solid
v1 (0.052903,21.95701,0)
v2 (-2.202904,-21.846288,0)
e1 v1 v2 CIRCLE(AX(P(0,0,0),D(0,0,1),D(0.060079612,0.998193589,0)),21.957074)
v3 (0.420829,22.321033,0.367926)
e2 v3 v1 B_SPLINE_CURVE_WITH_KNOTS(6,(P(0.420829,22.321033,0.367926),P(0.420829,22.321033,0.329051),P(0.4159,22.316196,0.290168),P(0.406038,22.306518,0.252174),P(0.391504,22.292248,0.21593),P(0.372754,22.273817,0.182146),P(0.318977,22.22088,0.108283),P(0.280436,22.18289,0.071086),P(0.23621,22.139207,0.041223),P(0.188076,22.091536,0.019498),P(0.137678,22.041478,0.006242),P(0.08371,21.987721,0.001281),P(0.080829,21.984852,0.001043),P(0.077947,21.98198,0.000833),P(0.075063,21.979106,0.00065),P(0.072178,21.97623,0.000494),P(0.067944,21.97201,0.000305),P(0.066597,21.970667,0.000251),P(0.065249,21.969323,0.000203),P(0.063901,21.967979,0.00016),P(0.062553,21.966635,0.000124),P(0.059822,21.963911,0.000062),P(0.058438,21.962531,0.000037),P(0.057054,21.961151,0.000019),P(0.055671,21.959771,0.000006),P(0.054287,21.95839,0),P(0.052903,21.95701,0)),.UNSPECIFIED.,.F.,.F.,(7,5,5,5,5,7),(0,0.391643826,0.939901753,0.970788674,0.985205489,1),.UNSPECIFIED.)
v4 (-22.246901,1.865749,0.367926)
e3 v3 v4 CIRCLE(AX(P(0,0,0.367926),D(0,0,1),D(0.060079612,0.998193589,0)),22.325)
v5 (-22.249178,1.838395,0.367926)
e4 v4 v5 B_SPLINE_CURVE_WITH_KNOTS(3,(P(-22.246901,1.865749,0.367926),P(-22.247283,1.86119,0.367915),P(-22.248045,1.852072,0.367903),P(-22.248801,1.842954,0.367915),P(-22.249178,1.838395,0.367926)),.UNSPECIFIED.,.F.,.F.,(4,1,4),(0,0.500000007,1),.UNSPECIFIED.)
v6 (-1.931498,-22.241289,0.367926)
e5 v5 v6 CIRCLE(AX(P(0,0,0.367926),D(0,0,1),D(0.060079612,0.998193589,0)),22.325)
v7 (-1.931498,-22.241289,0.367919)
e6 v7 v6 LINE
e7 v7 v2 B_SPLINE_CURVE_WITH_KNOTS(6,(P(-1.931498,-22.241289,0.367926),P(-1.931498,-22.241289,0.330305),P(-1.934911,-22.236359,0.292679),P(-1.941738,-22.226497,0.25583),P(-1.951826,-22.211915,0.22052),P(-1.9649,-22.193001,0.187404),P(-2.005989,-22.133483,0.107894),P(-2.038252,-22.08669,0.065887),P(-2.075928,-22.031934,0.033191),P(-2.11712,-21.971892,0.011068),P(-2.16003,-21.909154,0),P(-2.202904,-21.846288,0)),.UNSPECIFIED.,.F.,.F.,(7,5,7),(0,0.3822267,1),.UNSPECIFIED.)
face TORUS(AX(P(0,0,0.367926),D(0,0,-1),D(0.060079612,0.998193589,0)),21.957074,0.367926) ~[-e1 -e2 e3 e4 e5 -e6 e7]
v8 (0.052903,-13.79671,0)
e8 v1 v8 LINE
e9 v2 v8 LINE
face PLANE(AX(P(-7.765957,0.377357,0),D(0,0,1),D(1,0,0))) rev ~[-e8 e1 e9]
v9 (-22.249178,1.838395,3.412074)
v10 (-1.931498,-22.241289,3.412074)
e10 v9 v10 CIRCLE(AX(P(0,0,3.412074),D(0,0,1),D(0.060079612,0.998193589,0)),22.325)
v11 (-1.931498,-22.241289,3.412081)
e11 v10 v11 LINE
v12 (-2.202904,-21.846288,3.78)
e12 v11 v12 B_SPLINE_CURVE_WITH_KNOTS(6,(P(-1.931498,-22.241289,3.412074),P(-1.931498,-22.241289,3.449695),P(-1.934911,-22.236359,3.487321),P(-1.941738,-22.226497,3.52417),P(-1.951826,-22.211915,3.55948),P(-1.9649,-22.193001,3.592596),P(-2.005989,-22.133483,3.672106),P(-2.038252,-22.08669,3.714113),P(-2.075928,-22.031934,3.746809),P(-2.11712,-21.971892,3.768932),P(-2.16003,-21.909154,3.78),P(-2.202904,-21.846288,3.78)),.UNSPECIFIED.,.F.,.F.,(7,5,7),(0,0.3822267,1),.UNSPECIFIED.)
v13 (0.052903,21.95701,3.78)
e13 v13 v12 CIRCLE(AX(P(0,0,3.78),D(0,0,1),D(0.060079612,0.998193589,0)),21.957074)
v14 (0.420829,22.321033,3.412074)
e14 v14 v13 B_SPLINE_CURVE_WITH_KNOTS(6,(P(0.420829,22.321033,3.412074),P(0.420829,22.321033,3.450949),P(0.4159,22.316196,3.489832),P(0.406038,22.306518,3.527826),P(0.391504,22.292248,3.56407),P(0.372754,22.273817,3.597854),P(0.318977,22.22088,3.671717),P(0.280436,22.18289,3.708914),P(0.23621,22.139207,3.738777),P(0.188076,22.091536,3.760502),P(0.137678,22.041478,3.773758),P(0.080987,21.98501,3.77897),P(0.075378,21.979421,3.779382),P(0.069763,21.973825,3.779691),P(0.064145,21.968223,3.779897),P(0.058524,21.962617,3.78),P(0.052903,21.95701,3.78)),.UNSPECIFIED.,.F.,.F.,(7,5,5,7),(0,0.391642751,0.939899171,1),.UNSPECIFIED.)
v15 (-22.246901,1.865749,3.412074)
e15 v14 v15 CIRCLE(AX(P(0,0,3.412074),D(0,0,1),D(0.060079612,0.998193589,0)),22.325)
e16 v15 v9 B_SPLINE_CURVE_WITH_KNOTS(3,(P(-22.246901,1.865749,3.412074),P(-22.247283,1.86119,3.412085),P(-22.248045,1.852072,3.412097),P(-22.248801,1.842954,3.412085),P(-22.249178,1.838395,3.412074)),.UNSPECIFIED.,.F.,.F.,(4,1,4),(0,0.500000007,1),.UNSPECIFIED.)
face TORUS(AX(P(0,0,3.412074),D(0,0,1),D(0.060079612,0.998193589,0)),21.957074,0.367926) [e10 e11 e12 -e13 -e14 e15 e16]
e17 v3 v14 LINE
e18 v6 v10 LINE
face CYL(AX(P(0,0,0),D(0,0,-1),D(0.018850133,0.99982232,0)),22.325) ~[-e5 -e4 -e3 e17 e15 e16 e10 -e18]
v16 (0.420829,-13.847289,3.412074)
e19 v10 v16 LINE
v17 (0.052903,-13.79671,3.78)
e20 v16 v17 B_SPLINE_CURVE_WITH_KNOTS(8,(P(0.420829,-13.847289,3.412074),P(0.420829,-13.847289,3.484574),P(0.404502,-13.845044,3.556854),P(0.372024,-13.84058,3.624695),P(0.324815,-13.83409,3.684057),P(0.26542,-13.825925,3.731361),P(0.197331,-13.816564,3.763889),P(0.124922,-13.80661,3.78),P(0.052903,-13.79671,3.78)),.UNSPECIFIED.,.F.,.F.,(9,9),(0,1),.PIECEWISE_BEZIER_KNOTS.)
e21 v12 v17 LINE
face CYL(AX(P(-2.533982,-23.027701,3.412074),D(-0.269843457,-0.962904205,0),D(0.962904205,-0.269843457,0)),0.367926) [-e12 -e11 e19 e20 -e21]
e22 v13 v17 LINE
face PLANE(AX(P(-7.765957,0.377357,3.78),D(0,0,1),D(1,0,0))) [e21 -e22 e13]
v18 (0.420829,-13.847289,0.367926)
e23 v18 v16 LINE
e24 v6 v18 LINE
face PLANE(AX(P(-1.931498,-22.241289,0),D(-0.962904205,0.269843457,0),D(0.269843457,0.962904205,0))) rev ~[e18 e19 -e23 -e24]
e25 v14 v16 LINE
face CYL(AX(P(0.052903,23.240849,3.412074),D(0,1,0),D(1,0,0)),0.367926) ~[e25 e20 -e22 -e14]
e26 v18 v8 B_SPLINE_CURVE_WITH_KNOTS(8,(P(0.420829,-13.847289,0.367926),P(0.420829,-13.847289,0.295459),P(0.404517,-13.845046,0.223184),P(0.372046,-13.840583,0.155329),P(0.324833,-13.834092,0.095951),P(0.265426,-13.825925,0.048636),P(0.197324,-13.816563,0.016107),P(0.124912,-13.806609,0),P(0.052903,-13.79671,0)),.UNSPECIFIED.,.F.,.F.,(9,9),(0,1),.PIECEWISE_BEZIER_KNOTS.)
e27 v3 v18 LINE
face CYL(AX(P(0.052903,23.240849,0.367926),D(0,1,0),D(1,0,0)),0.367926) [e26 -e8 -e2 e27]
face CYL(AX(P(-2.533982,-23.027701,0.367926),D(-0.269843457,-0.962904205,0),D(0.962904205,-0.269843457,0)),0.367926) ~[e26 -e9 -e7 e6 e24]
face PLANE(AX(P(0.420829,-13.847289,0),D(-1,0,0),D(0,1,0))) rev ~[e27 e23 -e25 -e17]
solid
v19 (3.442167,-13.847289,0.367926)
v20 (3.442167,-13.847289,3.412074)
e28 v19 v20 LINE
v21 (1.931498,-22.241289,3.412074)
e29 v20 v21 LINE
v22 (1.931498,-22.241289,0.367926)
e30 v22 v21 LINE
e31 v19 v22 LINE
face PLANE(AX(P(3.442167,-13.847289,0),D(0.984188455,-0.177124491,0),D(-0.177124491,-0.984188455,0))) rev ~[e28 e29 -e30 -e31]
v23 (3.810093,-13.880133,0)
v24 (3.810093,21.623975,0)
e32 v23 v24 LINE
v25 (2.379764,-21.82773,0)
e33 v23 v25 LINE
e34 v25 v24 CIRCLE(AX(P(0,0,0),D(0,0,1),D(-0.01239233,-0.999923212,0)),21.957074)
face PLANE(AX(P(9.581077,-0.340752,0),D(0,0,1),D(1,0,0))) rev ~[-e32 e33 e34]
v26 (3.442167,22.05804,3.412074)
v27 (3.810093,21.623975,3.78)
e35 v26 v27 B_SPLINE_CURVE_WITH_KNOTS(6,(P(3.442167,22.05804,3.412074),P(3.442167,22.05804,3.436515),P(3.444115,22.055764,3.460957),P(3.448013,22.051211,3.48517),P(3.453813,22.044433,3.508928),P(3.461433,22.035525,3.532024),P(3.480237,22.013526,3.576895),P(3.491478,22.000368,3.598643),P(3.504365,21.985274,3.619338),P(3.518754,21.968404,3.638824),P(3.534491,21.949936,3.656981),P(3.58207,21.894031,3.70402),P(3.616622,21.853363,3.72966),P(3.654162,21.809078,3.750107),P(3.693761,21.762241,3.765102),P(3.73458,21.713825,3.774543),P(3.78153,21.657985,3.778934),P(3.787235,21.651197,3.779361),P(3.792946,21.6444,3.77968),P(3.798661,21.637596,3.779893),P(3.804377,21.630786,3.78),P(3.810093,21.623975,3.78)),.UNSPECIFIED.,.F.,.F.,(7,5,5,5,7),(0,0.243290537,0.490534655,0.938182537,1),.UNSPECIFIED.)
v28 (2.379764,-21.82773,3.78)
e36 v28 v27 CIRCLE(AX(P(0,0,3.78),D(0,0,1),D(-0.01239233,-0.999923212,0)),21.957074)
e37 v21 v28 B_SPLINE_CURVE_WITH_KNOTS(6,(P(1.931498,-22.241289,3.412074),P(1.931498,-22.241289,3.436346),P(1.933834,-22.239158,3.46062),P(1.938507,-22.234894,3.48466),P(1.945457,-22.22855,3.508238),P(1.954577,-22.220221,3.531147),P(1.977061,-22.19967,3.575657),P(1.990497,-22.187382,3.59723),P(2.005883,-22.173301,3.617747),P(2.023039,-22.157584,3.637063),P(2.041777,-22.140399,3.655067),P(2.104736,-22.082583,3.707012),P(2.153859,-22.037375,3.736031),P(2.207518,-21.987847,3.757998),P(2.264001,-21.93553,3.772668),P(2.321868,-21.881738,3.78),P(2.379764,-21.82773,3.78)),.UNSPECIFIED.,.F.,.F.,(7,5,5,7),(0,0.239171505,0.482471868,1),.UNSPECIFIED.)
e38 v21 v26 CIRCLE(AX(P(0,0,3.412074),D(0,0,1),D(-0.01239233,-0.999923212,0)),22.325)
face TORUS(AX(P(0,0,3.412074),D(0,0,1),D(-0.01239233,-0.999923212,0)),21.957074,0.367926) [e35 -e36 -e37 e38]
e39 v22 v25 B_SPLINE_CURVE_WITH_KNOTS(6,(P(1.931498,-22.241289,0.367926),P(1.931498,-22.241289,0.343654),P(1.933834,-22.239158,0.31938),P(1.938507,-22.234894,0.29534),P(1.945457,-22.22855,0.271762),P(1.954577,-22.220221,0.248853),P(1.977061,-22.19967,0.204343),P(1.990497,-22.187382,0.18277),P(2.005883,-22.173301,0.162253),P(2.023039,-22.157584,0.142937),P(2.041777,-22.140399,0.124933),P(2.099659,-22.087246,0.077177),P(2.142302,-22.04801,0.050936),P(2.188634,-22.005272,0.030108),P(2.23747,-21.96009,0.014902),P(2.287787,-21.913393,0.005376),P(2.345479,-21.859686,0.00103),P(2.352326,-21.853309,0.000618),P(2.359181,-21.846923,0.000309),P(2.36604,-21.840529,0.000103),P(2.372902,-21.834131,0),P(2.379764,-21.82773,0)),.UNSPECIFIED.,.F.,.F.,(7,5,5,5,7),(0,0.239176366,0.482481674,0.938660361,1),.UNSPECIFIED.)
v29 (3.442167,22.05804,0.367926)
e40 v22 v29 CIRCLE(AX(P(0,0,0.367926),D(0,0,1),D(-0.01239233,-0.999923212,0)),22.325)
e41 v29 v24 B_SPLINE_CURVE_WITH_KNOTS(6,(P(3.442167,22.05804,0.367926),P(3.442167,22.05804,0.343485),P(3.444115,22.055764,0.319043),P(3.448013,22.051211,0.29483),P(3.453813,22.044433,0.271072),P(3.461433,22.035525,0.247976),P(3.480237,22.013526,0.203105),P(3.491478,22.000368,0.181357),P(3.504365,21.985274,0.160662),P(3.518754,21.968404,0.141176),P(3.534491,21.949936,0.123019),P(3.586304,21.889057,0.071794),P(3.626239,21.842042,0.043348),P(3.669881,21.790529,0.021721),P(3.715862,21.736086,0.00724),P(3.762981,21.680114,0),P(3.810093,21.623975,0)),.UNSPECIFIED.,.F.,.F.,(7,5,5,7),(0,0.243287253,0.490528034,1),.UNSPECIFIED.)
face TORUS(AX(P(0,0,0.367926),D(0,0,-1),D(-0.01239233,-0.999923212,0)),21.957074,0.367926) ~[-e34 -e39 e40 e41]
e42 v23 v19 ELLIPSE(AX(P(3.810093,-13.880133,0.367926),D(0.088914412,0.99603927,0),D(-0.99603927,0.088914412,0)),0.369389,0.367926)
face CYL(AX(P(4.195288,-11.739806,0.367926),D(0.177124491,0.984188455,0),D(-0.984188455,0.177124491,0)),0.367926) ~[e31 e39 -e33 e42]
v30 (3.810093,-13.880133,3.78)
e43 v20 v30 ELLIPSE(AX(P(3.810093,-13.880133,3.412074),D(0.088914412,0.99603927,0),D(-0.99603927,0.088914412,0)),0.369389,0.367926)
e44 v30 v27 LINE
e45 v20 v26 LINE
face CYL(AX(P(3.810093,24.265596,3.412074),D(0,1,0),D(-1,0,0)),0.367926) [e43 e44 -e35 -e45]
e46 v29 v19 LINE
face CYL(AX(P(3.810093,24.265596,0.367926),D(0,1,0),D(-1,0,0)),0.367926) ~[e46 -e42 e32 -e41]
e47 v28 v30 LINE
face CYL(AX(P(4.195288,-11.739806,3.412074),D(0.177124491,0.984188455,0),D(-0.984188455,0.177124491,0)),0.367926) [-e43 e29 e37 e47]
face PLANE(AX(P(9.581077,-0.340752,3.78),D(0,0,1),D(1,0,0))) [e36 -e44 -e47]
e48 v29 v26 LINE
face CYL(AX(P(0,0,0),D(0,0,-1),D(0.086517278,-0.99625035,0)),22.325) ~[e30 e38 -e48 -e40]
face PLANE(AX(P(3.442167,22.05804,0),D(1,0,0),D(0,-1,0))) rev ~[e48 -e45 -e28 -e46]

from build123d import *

# Parameters (mm, degrees)
F1_DEPTH      = 3.78
F2_T4_DEPTH   = 40.3204423055
F2_T9_DEPTH   = 12.9439682299
F2_T14_DEPTH  = 12.9439682299
F2_T19_DEPTH  = 40.3204423055
F2_T22_ANGLE  = 177.5138742153
F2_T24_ANGLE  = 177.5138742153
F2_T29_DEPTH  = 40.3204423055
F2_T33_DEPTH  = 12.9439682299
F2_T40_DEPTH  = 40.3204423055
F2_T44_DEPTH  = 12.9439682299
F2_2_T1_DEPTH = 38.6518237684
F2_2_T3_DEPTH = 11.2008796601
F2_2_T6_ANGLE = 180.8453878552
F2_2_T8_ANGLE = 180.8453878552


# Not quite as in the source:
# - a fillet or chamfer that OpenCascade refuses, or shapes differently, is made with other operations: its cross-section is extruded or revolved along the edge and cut away or added


with BuildPart() as f1:
    # F0 (on Top) → F1 (new body)
    with BuildSketch(Plane.XY):
        with BuildLine():
            Line((3.4421672434, -13.8472889727), (1.9314982338, -22.2412890717))
            ThreePointArc((1.9314982338, -22.2412890717), (22.3120303803, -0.7608714143), (3.4421672434, 22.0580395699))
            Line((3.4421672434, 22.0580395699), (3.4421672434, -13.8472889727))
        make_face()
    extrude(amount=F1_DEPTH)

    # F2: fillet of radius 0.3679261469 on 6 edges, made by hand


with BuildPart() as f1b:
    # F0 (on Top) → F1, piece 2 (new body)
    with BuildSketch(Plane.XY):
        with BuildLine():
            Line((0.4208292241, -13.8472889727), (0.4208292241, 22.3210333041))
            ThreePointArc((0.4208292241, 22.3210333041), (-22.2939604848, 1.1768393701), (-1.9314982338, -22.2412890717))
            Line((-1.9314982338, -22.2412890717), (0.4208292241, -13.8472889727))
        make_face()
    extrude(amount=F1_DEPTH)

    # F2#2: fillet of radius 0.3679261469 on 6 edges, made by hand

    # F2_2_s2 → F2_2_t1 (cut)
    with BuildSketch(Plane.XZ.offset(-23.2408486714)):
        with BuildLine():
            ThreePointArc((0.4208292241, 3.4120738531), (0.3130661507, 3.6722369265), (0.0529030772, 3.78))
            Line((0.0529030772, 3.78), (0.4208292241, 3.78))
            Line((0.4208292241, 3.78), (0.4208292241, 3.4120738531))
        make_face()
        with BuildLine():
            ThreePointArc((0.4208292241, 0.3679261469), (0.3130661507, 0.1077630735), (0.0529030772, 0))
            Line((0.0529030772, 0), (0.4208292241, 0))
            Line((0.4208292241, 0), (0.4208292241, 0.3679261469))
        make_face()
    extrude(amount=F2_2_T1_DEPTH, mode=Mode.SUBTRACT)

    # F2_2_s4 → F2_2_t3 (cut)
    with BuildSketch(Plane(origin=(-6.1678788932, -22.0093405225, 0), x_dir=(0, 0, 1), z_dir=(0.2698434566, 0.9629042055, 0))):
        with BuildLine():
            ThreePointArc((3.4120738531, 4.1418185513), (3.6722369265, 4.0340554778), (3.78, 3.7738924044))
            Line((3.78, 3.7738924044), (3.78, 4.1418185513))
            Line((3.78, 4.1418185513), (3.4120738531, 4.1418185513))
        make_face()
        with BuildLine():
            ThreePointArc((0.3679261469, 4.1418185513), (0.1077630735, 4.0340554778), (0, 3.7738924044))
            Line((0, 3.7738924044), (0, 4.1418185513))
            Line((0, 4.1418185513), (0.3679261469, 4.1418185513))
        make_face()
    extrude(amount=F2_2_T3_DEPTH, mode=Mode.SUBTRACT)

    # F2_2_s5 → F2_2_t6 (revolve, cut)
    with BuildSketch(Plane(origin=(0, 0, 0), x_dir=(0, 0, 1), z_dir=(0.9981935886, -0.0600796118, 0))):
        with BuildLine():
            ThreePointArc((3.4120738531, -22.325), (3.6722369265, -22.2172369265), (3.78, -21.9570738531))
            Line((3.78, -21.9570738531), (3.78, -22.325))
            Line((3.78, -22.325), (3.4120738531, -22.325))
        make_face()
    revolve(axis=Axis((0, 0, 3.78), (0, 0, 1)), revolution_arc=F2_2_T6_ANGLE, mode=Mode.SUBTRACT)

    # F2_2_s7 → F2_2_t8 (revolve, cut)
    with BuildSketch(Plane(origin=(0, 0, 0), x_dir=(0, 0, 1), z_dir=(0.9981935886, -0.0600796118, 0))):
        with BuildLine():
            ThreePointArc((0.3679261469, -22.325), (0.1077630735, -22.2172369265), (0, -21.9570738531))
            Line((0, -21.9570738531), (0, -22.325))
            Line((0, -22.325), (0.3679261469, -22.325))
        make_face()
    revolve(axis=Axis((0, 0, 0), (0, 0, 1)), revolution_arc=F2_2_T8_ANGLE, mode=Mode.SUBTRACT)


with BuildPart() as f2_tool2:
    # F2_s3 → F2_t4 (new body)
    with BuildSketch(Plane.XZ.offset(-24.2655964514)):
        with BuildLine():
            ThreePointArc((3.4421672434, 3.4120738531), (3.5499303169, 3.6722369265), (3.8100933903, 3.78))
            Line((3.8100933903, 3.78), (3.8100933903, 3.7873585229))
            Line((3.8100933903, 3.7873585229), (3.4348087205, 3.7873585229))
            Line((3.4348087205, 3.7873585229), (3.4348087205, 3.4120738531))
            Line((3.4348087205, 3.4120738531), (3.4421672434, 3.4120738531))
        make_face()
    extrude(amount=F2_T4_DEPTH)

    split(bisect_by=Plane(origin=(5.7480889705, -1.0344841279, 0), x_dir=(0, 0, 1), z_dir=(-0.9841884548, 0.1771244914, 0)), keep=Keep.TOP)


with BuildPart() as f1_1:
    add(f1.part)

    # F2_t1: cut F2_tool2
    add(f2_tool2.part, mode=Mode.SUBTRACT)


with BuildPart() as f2_tool7:
    # F2_s8 → F2_t9 (new body)
    with BuildSketch(Plane(origin=(-1.9149093372, -10.6401528487, 0), x_dir=(0, 0, 1), z_dir=(-0.1771244914, -0.9841884548, 0))):
        with BuildLine():
            ThreePointArc((3.4120738531, -5.8404352769), (3.6722369265, -5.9481983504), (3.78, -6.2083614238))
            Line((3.78, -6.2083614238), (3.7873585229, -6.2083614238))
            Line((3.7873585229, -6.2083614238), (3.7873585229, -5.833076754))
            Line((3.7873585229, -5.833076754), (3.4120738531, -5.833076754))
            Line((3.4120738531, -5.833076754), (3.4120738531, -5.8404352769))
        make_face()
    extrude(amount=F2_T9_DEPTH)

    split(bisect_by=Plane.YZ.offset(3.4421672434), keep=Keep.BOTTOM)


with BuildPart() as f1_2:
    add(f1_1.part)

    # F2_t6: cut F2_tool7
    add(f2_tool7.part, mode=Mode.SUBTRACT)


with BuildPart() as f2_tool12:
    # F2_s13 → F2_t14 (new body)
    with BuildSketch(Plane(origin=(-1.9149093372, -10.6401528487, 0), x_dir=(0, 0, 1), z_dir=(-0.1771244914, -0.9841884548, 0))):
        with BuildLine():
            ThreePointArc((0.3679261469, -5.8404352769), (0.1077630735, -5.9481983504), (0, -6.2083614238))
            Line((0, -6.2083614238), (-0.0073585229, -6.2083614238))
            Line((-0.0073585229, -6.2083614238), (-0.0073585229, -5.833076754))
            Line((-0.0073585229, -5.833076754), (0.3679261469, -5.833076754))
            Line((0.3679261469, -5.833076754), (0.3679261469, -5.8404352769))
        make_face()
    extrude(amount=F2_T14_DEPTH)

    split(bisect_by=Plane.YZ.offset(3.4421672434), keep=Keep.BOTTOM)


with BuildPart() as f1_3:
    add(f1_2.part)

    # F2_t11: cut F2_tool12
    add(f2_tool12.part, mode=Mode.SUBTRACT)


with BuildPart() as f2_tool17:
    # F2_s18 → F2_t19 (new body)
    with BuildSketch(Plane.XZ.offset(-24.2655964514)):
        with BuildLine():
            ThreePointArc((3.4421672434, 0.3679261469), (3.5499303169, 0.1077630735), (3.8100933903, 0))
            Line((3.8100933903, 0), (3.8100933903, -0.0073585229))
            Line((3.8100933903, -0.0073585229), (3.4348087205, -0.0073585229))
            Line((3.4348087205, -0.0073585229), (3.4348087205, 0.3679261469))
            Line((3.4348087205, 0.3679261469), (3.4421672434, 0.3679261469))
        make_face()
    extrude(amount=F2_T19_DEPTH)

    split(bisect_by=Plane(origin=(5.7480889705, -1.0344841279, 0), x_dir=(0, 0, 1), z_dir=(-0.9841884548, 0.1771244914, 0)), keep=Keep.TOP)


with BuildPart() as f1_4:
    add(f1_3.part)

    # F2_t16: cut F2_tool17
    add(f2_tool17.part, mode=Mode.SUBTRACT)

    # F2_s21 → F2_t22 (revolve, cut)
    with BuildSketch(Plane(origin=(0, 0, 0), x_dir=(0, 0, 1), z_dir=(-0.9999232121, 0.0123923302, 0))):
        with BuildLine():
            ThreePointArc((0.3679261469, -22.325), (0.1077630735, -22.2172369265), (0, -21.9570738531))
            Line((0, -21.9570738531), (-0.0073585229, -21.9570738531))
            Line((-0.0073585229, -21.9570738531), (-0.0073585229, -22.3323585229))
            Line((-0.0073585229, -22.3323585229), (0.3679261469, -22.3323585229))
            Line((0.3679261469, -22.3323585229), (0.3679261469, -22.325))
        make_face()
    revolve(axis=Axis((0, 0, 0), (0, 0, 1)), revolution_arc=F2_T22_ANGLE, mode=Mode.SUBTRACT)

    # F2_s23 → F2_t24 (revolve, cut)
    with BuildSketch(Plane(origin=(0, 0, 0), x_dir=(0, 0, 1), z_dir=(-0.9999232121, 0.0123923302, 0))):
        with BuildLine():
            ThreePointArc((3.4120738531, -22.325), (3.6722369265, -22.2172369265), (3.78, -21.9570738531))
            Line((3.78, -21.9570738531), (3.7873585229, -21.9570738531))
            Line((3.7873585229, -21.9570738531), (3.7873585229, -22.3323585229))
            Line((3.7873585229, -22.3323585229), (3.4120738531, -22.3323585229))
            Line((3.4120738531, -22.3323585229), (3.4120738531, -22.325))
        make_face()
    revolve(axis=Axis((0, 0, 3.78), (0, 0, 1)), revolution_arc=F2_T24_ANGLE, mode=Mode.SUBTRACT)


with BuildPart() as f2_tool27:
    # F2_s28 → F2_t29 (new body)
    with BuildSketch(Plane.XZ.offset(-24.2655964514)):
        with BuildLine():
            ThreePointArc((3.4421672434, 3.4120738531), (3.5499303169, 3.6722369265), (3.8100933903, 3.78))
            Line((3.8100933903, 3.78), (3.8100933903, 3.7873585229))
            Line((3.8100933903, 3.7873585229), (3.4348087205, 3.7873585229))
            Line((3.4348087205, 3.7873585229), (3.4348087205, 3.4120738531))
            Line((3.4348087205, 3.4120738531), (3.4421672434, 3.4120738531))
        make_face()
    extrude(amount=F2_T29_DEPTH)

    split(bisect_by=Plane(origin=(5.7480889705, -1.0344841279, 0), x_dir=(0, 0, 1), z_dir=(0.9841884548, -0.1771244914, 0)), keep=Keep.TOP)


with BuildPart() as f2_tool31:
    # F2_s32 → F2_t33 (new body)
    with BuildSketch(Plane(origin=(-1.9149093372, -10.6401528487, 0), x_dir=(0, 0, 1), z_dir=(-0.1771244914, -0.9841884548, 0))):
        with BuildLine():
            ThreePointArc((3.4120738531, -5.8404352769), (3.6722369265, -5.9481983504), (3.78, -6.2083614238))
            Line((3.78, -6.2083614238), (3.7873585229, -6.2083614238))
            Line((3.7873585229, -6.2083614238), (3.7873585229, -5.833076754))
            Line((3.7873585229, -5.833076754), (3.4120738531, -5.833076754))
            Line((3.4120738531, -5.833076754), (3.4120738531, -5.8404352769))
        make_face()
    extrude(amount=F2_T33_DEPTH)

    split(bisect_by=Plane.YZ.offset(3.4421672434), keep=Keep.TOP)


with BuildPart() as f2_tool27_1:
    add(f2_tool27.part)

    # F2_t35: intersect F2_tool31
    add(f2_tool31.part, mode=Mode.INTERSECT)


with BuildPart() as f1_5:
    add(f1_4.part)

    # F2_t25: cut F2_tool27
    add(f2_tool27_1.part, mode=Mode.SUBTRACT)


with BuildPart() as f2_tool38:
    # F2_s39 → F2_t40 (new body)
    with BuildSketch(Plane.XZ.offset(-24.2655964514)):
        with BuildLine():
            ThreePointArc((3.4421672434, 0.3679261469), (3.5499303169, 0.1077630735), (3.8100933903, 0))
            Line((3.8100933903, 0), (3.8100933903, -0.0073585229))
            Line((3.8100933903, -0.0073585229), (3.4348087205, -0.0073585229))
            Line((3.4348087205, -0.0073585229), (3.4348087205, 0.3679261469))
            Line((3.4348087205, 0.3679261469), (3.4421672434, 0.3679261469))
        make_face()
    extrude(amount=F2_T40_DEPTH)

    split(bisect_by=Plane(origin=(5.7480889705, -1.0344841279, 0), x_dir=(0, 0, 1), z_dir=(0.9841884548, -0.1771244914, 0)), keep=Keep.TOP)


with BuildPart() as f2_tool42:
    # F2_s43 → F2_t44 (new body)
    with BuildSketch(Plane(origin=(-1.9149093372, -10.6401528487, 0), x_dir=(0, 0, 1), z_dir=(-0.1771244914, -0.9841884548, 0))):
        with BuildLine():
            ThreePointArc((0.3679261469, -5.8404352769), (0.1077630735, -5.9481983504), (0, -6.2083614238))
            Line((0, -6.2083614238), (-0.0073585229, -6.2083614238))
            Line((-0.0073585229, -6.2083614238), (-0.0073585229, -5.833076754))
            Line((-0.0073585229, -5.833076754), (0.3679261469, -5.833076754))
            Line((0.3679261469, -5.833076754), (0.3679261469, -5.8404352769))
        make_face()
    extrude(amount=F2_T44_DEPTH)

    split(bisect_by=Plane.YZ.offset(3.4421672434), keep=Keep.TOP)


with BuildPart() as f2_tool38_1:
    add(f2_tool38.part)

    # F2_t46: intersect F2_tool42
    add(f2_tool42.part, mode=Mode.INTERSECT)


with BuildPart() as f1_6:
    add(f1_5.part)

    # F2_t36: cut F2_tool38
    add(f2_tool38_1.part, mode=Mode.SUBTRACT)


solid = Compound([f1b.part, f1_6.part])
